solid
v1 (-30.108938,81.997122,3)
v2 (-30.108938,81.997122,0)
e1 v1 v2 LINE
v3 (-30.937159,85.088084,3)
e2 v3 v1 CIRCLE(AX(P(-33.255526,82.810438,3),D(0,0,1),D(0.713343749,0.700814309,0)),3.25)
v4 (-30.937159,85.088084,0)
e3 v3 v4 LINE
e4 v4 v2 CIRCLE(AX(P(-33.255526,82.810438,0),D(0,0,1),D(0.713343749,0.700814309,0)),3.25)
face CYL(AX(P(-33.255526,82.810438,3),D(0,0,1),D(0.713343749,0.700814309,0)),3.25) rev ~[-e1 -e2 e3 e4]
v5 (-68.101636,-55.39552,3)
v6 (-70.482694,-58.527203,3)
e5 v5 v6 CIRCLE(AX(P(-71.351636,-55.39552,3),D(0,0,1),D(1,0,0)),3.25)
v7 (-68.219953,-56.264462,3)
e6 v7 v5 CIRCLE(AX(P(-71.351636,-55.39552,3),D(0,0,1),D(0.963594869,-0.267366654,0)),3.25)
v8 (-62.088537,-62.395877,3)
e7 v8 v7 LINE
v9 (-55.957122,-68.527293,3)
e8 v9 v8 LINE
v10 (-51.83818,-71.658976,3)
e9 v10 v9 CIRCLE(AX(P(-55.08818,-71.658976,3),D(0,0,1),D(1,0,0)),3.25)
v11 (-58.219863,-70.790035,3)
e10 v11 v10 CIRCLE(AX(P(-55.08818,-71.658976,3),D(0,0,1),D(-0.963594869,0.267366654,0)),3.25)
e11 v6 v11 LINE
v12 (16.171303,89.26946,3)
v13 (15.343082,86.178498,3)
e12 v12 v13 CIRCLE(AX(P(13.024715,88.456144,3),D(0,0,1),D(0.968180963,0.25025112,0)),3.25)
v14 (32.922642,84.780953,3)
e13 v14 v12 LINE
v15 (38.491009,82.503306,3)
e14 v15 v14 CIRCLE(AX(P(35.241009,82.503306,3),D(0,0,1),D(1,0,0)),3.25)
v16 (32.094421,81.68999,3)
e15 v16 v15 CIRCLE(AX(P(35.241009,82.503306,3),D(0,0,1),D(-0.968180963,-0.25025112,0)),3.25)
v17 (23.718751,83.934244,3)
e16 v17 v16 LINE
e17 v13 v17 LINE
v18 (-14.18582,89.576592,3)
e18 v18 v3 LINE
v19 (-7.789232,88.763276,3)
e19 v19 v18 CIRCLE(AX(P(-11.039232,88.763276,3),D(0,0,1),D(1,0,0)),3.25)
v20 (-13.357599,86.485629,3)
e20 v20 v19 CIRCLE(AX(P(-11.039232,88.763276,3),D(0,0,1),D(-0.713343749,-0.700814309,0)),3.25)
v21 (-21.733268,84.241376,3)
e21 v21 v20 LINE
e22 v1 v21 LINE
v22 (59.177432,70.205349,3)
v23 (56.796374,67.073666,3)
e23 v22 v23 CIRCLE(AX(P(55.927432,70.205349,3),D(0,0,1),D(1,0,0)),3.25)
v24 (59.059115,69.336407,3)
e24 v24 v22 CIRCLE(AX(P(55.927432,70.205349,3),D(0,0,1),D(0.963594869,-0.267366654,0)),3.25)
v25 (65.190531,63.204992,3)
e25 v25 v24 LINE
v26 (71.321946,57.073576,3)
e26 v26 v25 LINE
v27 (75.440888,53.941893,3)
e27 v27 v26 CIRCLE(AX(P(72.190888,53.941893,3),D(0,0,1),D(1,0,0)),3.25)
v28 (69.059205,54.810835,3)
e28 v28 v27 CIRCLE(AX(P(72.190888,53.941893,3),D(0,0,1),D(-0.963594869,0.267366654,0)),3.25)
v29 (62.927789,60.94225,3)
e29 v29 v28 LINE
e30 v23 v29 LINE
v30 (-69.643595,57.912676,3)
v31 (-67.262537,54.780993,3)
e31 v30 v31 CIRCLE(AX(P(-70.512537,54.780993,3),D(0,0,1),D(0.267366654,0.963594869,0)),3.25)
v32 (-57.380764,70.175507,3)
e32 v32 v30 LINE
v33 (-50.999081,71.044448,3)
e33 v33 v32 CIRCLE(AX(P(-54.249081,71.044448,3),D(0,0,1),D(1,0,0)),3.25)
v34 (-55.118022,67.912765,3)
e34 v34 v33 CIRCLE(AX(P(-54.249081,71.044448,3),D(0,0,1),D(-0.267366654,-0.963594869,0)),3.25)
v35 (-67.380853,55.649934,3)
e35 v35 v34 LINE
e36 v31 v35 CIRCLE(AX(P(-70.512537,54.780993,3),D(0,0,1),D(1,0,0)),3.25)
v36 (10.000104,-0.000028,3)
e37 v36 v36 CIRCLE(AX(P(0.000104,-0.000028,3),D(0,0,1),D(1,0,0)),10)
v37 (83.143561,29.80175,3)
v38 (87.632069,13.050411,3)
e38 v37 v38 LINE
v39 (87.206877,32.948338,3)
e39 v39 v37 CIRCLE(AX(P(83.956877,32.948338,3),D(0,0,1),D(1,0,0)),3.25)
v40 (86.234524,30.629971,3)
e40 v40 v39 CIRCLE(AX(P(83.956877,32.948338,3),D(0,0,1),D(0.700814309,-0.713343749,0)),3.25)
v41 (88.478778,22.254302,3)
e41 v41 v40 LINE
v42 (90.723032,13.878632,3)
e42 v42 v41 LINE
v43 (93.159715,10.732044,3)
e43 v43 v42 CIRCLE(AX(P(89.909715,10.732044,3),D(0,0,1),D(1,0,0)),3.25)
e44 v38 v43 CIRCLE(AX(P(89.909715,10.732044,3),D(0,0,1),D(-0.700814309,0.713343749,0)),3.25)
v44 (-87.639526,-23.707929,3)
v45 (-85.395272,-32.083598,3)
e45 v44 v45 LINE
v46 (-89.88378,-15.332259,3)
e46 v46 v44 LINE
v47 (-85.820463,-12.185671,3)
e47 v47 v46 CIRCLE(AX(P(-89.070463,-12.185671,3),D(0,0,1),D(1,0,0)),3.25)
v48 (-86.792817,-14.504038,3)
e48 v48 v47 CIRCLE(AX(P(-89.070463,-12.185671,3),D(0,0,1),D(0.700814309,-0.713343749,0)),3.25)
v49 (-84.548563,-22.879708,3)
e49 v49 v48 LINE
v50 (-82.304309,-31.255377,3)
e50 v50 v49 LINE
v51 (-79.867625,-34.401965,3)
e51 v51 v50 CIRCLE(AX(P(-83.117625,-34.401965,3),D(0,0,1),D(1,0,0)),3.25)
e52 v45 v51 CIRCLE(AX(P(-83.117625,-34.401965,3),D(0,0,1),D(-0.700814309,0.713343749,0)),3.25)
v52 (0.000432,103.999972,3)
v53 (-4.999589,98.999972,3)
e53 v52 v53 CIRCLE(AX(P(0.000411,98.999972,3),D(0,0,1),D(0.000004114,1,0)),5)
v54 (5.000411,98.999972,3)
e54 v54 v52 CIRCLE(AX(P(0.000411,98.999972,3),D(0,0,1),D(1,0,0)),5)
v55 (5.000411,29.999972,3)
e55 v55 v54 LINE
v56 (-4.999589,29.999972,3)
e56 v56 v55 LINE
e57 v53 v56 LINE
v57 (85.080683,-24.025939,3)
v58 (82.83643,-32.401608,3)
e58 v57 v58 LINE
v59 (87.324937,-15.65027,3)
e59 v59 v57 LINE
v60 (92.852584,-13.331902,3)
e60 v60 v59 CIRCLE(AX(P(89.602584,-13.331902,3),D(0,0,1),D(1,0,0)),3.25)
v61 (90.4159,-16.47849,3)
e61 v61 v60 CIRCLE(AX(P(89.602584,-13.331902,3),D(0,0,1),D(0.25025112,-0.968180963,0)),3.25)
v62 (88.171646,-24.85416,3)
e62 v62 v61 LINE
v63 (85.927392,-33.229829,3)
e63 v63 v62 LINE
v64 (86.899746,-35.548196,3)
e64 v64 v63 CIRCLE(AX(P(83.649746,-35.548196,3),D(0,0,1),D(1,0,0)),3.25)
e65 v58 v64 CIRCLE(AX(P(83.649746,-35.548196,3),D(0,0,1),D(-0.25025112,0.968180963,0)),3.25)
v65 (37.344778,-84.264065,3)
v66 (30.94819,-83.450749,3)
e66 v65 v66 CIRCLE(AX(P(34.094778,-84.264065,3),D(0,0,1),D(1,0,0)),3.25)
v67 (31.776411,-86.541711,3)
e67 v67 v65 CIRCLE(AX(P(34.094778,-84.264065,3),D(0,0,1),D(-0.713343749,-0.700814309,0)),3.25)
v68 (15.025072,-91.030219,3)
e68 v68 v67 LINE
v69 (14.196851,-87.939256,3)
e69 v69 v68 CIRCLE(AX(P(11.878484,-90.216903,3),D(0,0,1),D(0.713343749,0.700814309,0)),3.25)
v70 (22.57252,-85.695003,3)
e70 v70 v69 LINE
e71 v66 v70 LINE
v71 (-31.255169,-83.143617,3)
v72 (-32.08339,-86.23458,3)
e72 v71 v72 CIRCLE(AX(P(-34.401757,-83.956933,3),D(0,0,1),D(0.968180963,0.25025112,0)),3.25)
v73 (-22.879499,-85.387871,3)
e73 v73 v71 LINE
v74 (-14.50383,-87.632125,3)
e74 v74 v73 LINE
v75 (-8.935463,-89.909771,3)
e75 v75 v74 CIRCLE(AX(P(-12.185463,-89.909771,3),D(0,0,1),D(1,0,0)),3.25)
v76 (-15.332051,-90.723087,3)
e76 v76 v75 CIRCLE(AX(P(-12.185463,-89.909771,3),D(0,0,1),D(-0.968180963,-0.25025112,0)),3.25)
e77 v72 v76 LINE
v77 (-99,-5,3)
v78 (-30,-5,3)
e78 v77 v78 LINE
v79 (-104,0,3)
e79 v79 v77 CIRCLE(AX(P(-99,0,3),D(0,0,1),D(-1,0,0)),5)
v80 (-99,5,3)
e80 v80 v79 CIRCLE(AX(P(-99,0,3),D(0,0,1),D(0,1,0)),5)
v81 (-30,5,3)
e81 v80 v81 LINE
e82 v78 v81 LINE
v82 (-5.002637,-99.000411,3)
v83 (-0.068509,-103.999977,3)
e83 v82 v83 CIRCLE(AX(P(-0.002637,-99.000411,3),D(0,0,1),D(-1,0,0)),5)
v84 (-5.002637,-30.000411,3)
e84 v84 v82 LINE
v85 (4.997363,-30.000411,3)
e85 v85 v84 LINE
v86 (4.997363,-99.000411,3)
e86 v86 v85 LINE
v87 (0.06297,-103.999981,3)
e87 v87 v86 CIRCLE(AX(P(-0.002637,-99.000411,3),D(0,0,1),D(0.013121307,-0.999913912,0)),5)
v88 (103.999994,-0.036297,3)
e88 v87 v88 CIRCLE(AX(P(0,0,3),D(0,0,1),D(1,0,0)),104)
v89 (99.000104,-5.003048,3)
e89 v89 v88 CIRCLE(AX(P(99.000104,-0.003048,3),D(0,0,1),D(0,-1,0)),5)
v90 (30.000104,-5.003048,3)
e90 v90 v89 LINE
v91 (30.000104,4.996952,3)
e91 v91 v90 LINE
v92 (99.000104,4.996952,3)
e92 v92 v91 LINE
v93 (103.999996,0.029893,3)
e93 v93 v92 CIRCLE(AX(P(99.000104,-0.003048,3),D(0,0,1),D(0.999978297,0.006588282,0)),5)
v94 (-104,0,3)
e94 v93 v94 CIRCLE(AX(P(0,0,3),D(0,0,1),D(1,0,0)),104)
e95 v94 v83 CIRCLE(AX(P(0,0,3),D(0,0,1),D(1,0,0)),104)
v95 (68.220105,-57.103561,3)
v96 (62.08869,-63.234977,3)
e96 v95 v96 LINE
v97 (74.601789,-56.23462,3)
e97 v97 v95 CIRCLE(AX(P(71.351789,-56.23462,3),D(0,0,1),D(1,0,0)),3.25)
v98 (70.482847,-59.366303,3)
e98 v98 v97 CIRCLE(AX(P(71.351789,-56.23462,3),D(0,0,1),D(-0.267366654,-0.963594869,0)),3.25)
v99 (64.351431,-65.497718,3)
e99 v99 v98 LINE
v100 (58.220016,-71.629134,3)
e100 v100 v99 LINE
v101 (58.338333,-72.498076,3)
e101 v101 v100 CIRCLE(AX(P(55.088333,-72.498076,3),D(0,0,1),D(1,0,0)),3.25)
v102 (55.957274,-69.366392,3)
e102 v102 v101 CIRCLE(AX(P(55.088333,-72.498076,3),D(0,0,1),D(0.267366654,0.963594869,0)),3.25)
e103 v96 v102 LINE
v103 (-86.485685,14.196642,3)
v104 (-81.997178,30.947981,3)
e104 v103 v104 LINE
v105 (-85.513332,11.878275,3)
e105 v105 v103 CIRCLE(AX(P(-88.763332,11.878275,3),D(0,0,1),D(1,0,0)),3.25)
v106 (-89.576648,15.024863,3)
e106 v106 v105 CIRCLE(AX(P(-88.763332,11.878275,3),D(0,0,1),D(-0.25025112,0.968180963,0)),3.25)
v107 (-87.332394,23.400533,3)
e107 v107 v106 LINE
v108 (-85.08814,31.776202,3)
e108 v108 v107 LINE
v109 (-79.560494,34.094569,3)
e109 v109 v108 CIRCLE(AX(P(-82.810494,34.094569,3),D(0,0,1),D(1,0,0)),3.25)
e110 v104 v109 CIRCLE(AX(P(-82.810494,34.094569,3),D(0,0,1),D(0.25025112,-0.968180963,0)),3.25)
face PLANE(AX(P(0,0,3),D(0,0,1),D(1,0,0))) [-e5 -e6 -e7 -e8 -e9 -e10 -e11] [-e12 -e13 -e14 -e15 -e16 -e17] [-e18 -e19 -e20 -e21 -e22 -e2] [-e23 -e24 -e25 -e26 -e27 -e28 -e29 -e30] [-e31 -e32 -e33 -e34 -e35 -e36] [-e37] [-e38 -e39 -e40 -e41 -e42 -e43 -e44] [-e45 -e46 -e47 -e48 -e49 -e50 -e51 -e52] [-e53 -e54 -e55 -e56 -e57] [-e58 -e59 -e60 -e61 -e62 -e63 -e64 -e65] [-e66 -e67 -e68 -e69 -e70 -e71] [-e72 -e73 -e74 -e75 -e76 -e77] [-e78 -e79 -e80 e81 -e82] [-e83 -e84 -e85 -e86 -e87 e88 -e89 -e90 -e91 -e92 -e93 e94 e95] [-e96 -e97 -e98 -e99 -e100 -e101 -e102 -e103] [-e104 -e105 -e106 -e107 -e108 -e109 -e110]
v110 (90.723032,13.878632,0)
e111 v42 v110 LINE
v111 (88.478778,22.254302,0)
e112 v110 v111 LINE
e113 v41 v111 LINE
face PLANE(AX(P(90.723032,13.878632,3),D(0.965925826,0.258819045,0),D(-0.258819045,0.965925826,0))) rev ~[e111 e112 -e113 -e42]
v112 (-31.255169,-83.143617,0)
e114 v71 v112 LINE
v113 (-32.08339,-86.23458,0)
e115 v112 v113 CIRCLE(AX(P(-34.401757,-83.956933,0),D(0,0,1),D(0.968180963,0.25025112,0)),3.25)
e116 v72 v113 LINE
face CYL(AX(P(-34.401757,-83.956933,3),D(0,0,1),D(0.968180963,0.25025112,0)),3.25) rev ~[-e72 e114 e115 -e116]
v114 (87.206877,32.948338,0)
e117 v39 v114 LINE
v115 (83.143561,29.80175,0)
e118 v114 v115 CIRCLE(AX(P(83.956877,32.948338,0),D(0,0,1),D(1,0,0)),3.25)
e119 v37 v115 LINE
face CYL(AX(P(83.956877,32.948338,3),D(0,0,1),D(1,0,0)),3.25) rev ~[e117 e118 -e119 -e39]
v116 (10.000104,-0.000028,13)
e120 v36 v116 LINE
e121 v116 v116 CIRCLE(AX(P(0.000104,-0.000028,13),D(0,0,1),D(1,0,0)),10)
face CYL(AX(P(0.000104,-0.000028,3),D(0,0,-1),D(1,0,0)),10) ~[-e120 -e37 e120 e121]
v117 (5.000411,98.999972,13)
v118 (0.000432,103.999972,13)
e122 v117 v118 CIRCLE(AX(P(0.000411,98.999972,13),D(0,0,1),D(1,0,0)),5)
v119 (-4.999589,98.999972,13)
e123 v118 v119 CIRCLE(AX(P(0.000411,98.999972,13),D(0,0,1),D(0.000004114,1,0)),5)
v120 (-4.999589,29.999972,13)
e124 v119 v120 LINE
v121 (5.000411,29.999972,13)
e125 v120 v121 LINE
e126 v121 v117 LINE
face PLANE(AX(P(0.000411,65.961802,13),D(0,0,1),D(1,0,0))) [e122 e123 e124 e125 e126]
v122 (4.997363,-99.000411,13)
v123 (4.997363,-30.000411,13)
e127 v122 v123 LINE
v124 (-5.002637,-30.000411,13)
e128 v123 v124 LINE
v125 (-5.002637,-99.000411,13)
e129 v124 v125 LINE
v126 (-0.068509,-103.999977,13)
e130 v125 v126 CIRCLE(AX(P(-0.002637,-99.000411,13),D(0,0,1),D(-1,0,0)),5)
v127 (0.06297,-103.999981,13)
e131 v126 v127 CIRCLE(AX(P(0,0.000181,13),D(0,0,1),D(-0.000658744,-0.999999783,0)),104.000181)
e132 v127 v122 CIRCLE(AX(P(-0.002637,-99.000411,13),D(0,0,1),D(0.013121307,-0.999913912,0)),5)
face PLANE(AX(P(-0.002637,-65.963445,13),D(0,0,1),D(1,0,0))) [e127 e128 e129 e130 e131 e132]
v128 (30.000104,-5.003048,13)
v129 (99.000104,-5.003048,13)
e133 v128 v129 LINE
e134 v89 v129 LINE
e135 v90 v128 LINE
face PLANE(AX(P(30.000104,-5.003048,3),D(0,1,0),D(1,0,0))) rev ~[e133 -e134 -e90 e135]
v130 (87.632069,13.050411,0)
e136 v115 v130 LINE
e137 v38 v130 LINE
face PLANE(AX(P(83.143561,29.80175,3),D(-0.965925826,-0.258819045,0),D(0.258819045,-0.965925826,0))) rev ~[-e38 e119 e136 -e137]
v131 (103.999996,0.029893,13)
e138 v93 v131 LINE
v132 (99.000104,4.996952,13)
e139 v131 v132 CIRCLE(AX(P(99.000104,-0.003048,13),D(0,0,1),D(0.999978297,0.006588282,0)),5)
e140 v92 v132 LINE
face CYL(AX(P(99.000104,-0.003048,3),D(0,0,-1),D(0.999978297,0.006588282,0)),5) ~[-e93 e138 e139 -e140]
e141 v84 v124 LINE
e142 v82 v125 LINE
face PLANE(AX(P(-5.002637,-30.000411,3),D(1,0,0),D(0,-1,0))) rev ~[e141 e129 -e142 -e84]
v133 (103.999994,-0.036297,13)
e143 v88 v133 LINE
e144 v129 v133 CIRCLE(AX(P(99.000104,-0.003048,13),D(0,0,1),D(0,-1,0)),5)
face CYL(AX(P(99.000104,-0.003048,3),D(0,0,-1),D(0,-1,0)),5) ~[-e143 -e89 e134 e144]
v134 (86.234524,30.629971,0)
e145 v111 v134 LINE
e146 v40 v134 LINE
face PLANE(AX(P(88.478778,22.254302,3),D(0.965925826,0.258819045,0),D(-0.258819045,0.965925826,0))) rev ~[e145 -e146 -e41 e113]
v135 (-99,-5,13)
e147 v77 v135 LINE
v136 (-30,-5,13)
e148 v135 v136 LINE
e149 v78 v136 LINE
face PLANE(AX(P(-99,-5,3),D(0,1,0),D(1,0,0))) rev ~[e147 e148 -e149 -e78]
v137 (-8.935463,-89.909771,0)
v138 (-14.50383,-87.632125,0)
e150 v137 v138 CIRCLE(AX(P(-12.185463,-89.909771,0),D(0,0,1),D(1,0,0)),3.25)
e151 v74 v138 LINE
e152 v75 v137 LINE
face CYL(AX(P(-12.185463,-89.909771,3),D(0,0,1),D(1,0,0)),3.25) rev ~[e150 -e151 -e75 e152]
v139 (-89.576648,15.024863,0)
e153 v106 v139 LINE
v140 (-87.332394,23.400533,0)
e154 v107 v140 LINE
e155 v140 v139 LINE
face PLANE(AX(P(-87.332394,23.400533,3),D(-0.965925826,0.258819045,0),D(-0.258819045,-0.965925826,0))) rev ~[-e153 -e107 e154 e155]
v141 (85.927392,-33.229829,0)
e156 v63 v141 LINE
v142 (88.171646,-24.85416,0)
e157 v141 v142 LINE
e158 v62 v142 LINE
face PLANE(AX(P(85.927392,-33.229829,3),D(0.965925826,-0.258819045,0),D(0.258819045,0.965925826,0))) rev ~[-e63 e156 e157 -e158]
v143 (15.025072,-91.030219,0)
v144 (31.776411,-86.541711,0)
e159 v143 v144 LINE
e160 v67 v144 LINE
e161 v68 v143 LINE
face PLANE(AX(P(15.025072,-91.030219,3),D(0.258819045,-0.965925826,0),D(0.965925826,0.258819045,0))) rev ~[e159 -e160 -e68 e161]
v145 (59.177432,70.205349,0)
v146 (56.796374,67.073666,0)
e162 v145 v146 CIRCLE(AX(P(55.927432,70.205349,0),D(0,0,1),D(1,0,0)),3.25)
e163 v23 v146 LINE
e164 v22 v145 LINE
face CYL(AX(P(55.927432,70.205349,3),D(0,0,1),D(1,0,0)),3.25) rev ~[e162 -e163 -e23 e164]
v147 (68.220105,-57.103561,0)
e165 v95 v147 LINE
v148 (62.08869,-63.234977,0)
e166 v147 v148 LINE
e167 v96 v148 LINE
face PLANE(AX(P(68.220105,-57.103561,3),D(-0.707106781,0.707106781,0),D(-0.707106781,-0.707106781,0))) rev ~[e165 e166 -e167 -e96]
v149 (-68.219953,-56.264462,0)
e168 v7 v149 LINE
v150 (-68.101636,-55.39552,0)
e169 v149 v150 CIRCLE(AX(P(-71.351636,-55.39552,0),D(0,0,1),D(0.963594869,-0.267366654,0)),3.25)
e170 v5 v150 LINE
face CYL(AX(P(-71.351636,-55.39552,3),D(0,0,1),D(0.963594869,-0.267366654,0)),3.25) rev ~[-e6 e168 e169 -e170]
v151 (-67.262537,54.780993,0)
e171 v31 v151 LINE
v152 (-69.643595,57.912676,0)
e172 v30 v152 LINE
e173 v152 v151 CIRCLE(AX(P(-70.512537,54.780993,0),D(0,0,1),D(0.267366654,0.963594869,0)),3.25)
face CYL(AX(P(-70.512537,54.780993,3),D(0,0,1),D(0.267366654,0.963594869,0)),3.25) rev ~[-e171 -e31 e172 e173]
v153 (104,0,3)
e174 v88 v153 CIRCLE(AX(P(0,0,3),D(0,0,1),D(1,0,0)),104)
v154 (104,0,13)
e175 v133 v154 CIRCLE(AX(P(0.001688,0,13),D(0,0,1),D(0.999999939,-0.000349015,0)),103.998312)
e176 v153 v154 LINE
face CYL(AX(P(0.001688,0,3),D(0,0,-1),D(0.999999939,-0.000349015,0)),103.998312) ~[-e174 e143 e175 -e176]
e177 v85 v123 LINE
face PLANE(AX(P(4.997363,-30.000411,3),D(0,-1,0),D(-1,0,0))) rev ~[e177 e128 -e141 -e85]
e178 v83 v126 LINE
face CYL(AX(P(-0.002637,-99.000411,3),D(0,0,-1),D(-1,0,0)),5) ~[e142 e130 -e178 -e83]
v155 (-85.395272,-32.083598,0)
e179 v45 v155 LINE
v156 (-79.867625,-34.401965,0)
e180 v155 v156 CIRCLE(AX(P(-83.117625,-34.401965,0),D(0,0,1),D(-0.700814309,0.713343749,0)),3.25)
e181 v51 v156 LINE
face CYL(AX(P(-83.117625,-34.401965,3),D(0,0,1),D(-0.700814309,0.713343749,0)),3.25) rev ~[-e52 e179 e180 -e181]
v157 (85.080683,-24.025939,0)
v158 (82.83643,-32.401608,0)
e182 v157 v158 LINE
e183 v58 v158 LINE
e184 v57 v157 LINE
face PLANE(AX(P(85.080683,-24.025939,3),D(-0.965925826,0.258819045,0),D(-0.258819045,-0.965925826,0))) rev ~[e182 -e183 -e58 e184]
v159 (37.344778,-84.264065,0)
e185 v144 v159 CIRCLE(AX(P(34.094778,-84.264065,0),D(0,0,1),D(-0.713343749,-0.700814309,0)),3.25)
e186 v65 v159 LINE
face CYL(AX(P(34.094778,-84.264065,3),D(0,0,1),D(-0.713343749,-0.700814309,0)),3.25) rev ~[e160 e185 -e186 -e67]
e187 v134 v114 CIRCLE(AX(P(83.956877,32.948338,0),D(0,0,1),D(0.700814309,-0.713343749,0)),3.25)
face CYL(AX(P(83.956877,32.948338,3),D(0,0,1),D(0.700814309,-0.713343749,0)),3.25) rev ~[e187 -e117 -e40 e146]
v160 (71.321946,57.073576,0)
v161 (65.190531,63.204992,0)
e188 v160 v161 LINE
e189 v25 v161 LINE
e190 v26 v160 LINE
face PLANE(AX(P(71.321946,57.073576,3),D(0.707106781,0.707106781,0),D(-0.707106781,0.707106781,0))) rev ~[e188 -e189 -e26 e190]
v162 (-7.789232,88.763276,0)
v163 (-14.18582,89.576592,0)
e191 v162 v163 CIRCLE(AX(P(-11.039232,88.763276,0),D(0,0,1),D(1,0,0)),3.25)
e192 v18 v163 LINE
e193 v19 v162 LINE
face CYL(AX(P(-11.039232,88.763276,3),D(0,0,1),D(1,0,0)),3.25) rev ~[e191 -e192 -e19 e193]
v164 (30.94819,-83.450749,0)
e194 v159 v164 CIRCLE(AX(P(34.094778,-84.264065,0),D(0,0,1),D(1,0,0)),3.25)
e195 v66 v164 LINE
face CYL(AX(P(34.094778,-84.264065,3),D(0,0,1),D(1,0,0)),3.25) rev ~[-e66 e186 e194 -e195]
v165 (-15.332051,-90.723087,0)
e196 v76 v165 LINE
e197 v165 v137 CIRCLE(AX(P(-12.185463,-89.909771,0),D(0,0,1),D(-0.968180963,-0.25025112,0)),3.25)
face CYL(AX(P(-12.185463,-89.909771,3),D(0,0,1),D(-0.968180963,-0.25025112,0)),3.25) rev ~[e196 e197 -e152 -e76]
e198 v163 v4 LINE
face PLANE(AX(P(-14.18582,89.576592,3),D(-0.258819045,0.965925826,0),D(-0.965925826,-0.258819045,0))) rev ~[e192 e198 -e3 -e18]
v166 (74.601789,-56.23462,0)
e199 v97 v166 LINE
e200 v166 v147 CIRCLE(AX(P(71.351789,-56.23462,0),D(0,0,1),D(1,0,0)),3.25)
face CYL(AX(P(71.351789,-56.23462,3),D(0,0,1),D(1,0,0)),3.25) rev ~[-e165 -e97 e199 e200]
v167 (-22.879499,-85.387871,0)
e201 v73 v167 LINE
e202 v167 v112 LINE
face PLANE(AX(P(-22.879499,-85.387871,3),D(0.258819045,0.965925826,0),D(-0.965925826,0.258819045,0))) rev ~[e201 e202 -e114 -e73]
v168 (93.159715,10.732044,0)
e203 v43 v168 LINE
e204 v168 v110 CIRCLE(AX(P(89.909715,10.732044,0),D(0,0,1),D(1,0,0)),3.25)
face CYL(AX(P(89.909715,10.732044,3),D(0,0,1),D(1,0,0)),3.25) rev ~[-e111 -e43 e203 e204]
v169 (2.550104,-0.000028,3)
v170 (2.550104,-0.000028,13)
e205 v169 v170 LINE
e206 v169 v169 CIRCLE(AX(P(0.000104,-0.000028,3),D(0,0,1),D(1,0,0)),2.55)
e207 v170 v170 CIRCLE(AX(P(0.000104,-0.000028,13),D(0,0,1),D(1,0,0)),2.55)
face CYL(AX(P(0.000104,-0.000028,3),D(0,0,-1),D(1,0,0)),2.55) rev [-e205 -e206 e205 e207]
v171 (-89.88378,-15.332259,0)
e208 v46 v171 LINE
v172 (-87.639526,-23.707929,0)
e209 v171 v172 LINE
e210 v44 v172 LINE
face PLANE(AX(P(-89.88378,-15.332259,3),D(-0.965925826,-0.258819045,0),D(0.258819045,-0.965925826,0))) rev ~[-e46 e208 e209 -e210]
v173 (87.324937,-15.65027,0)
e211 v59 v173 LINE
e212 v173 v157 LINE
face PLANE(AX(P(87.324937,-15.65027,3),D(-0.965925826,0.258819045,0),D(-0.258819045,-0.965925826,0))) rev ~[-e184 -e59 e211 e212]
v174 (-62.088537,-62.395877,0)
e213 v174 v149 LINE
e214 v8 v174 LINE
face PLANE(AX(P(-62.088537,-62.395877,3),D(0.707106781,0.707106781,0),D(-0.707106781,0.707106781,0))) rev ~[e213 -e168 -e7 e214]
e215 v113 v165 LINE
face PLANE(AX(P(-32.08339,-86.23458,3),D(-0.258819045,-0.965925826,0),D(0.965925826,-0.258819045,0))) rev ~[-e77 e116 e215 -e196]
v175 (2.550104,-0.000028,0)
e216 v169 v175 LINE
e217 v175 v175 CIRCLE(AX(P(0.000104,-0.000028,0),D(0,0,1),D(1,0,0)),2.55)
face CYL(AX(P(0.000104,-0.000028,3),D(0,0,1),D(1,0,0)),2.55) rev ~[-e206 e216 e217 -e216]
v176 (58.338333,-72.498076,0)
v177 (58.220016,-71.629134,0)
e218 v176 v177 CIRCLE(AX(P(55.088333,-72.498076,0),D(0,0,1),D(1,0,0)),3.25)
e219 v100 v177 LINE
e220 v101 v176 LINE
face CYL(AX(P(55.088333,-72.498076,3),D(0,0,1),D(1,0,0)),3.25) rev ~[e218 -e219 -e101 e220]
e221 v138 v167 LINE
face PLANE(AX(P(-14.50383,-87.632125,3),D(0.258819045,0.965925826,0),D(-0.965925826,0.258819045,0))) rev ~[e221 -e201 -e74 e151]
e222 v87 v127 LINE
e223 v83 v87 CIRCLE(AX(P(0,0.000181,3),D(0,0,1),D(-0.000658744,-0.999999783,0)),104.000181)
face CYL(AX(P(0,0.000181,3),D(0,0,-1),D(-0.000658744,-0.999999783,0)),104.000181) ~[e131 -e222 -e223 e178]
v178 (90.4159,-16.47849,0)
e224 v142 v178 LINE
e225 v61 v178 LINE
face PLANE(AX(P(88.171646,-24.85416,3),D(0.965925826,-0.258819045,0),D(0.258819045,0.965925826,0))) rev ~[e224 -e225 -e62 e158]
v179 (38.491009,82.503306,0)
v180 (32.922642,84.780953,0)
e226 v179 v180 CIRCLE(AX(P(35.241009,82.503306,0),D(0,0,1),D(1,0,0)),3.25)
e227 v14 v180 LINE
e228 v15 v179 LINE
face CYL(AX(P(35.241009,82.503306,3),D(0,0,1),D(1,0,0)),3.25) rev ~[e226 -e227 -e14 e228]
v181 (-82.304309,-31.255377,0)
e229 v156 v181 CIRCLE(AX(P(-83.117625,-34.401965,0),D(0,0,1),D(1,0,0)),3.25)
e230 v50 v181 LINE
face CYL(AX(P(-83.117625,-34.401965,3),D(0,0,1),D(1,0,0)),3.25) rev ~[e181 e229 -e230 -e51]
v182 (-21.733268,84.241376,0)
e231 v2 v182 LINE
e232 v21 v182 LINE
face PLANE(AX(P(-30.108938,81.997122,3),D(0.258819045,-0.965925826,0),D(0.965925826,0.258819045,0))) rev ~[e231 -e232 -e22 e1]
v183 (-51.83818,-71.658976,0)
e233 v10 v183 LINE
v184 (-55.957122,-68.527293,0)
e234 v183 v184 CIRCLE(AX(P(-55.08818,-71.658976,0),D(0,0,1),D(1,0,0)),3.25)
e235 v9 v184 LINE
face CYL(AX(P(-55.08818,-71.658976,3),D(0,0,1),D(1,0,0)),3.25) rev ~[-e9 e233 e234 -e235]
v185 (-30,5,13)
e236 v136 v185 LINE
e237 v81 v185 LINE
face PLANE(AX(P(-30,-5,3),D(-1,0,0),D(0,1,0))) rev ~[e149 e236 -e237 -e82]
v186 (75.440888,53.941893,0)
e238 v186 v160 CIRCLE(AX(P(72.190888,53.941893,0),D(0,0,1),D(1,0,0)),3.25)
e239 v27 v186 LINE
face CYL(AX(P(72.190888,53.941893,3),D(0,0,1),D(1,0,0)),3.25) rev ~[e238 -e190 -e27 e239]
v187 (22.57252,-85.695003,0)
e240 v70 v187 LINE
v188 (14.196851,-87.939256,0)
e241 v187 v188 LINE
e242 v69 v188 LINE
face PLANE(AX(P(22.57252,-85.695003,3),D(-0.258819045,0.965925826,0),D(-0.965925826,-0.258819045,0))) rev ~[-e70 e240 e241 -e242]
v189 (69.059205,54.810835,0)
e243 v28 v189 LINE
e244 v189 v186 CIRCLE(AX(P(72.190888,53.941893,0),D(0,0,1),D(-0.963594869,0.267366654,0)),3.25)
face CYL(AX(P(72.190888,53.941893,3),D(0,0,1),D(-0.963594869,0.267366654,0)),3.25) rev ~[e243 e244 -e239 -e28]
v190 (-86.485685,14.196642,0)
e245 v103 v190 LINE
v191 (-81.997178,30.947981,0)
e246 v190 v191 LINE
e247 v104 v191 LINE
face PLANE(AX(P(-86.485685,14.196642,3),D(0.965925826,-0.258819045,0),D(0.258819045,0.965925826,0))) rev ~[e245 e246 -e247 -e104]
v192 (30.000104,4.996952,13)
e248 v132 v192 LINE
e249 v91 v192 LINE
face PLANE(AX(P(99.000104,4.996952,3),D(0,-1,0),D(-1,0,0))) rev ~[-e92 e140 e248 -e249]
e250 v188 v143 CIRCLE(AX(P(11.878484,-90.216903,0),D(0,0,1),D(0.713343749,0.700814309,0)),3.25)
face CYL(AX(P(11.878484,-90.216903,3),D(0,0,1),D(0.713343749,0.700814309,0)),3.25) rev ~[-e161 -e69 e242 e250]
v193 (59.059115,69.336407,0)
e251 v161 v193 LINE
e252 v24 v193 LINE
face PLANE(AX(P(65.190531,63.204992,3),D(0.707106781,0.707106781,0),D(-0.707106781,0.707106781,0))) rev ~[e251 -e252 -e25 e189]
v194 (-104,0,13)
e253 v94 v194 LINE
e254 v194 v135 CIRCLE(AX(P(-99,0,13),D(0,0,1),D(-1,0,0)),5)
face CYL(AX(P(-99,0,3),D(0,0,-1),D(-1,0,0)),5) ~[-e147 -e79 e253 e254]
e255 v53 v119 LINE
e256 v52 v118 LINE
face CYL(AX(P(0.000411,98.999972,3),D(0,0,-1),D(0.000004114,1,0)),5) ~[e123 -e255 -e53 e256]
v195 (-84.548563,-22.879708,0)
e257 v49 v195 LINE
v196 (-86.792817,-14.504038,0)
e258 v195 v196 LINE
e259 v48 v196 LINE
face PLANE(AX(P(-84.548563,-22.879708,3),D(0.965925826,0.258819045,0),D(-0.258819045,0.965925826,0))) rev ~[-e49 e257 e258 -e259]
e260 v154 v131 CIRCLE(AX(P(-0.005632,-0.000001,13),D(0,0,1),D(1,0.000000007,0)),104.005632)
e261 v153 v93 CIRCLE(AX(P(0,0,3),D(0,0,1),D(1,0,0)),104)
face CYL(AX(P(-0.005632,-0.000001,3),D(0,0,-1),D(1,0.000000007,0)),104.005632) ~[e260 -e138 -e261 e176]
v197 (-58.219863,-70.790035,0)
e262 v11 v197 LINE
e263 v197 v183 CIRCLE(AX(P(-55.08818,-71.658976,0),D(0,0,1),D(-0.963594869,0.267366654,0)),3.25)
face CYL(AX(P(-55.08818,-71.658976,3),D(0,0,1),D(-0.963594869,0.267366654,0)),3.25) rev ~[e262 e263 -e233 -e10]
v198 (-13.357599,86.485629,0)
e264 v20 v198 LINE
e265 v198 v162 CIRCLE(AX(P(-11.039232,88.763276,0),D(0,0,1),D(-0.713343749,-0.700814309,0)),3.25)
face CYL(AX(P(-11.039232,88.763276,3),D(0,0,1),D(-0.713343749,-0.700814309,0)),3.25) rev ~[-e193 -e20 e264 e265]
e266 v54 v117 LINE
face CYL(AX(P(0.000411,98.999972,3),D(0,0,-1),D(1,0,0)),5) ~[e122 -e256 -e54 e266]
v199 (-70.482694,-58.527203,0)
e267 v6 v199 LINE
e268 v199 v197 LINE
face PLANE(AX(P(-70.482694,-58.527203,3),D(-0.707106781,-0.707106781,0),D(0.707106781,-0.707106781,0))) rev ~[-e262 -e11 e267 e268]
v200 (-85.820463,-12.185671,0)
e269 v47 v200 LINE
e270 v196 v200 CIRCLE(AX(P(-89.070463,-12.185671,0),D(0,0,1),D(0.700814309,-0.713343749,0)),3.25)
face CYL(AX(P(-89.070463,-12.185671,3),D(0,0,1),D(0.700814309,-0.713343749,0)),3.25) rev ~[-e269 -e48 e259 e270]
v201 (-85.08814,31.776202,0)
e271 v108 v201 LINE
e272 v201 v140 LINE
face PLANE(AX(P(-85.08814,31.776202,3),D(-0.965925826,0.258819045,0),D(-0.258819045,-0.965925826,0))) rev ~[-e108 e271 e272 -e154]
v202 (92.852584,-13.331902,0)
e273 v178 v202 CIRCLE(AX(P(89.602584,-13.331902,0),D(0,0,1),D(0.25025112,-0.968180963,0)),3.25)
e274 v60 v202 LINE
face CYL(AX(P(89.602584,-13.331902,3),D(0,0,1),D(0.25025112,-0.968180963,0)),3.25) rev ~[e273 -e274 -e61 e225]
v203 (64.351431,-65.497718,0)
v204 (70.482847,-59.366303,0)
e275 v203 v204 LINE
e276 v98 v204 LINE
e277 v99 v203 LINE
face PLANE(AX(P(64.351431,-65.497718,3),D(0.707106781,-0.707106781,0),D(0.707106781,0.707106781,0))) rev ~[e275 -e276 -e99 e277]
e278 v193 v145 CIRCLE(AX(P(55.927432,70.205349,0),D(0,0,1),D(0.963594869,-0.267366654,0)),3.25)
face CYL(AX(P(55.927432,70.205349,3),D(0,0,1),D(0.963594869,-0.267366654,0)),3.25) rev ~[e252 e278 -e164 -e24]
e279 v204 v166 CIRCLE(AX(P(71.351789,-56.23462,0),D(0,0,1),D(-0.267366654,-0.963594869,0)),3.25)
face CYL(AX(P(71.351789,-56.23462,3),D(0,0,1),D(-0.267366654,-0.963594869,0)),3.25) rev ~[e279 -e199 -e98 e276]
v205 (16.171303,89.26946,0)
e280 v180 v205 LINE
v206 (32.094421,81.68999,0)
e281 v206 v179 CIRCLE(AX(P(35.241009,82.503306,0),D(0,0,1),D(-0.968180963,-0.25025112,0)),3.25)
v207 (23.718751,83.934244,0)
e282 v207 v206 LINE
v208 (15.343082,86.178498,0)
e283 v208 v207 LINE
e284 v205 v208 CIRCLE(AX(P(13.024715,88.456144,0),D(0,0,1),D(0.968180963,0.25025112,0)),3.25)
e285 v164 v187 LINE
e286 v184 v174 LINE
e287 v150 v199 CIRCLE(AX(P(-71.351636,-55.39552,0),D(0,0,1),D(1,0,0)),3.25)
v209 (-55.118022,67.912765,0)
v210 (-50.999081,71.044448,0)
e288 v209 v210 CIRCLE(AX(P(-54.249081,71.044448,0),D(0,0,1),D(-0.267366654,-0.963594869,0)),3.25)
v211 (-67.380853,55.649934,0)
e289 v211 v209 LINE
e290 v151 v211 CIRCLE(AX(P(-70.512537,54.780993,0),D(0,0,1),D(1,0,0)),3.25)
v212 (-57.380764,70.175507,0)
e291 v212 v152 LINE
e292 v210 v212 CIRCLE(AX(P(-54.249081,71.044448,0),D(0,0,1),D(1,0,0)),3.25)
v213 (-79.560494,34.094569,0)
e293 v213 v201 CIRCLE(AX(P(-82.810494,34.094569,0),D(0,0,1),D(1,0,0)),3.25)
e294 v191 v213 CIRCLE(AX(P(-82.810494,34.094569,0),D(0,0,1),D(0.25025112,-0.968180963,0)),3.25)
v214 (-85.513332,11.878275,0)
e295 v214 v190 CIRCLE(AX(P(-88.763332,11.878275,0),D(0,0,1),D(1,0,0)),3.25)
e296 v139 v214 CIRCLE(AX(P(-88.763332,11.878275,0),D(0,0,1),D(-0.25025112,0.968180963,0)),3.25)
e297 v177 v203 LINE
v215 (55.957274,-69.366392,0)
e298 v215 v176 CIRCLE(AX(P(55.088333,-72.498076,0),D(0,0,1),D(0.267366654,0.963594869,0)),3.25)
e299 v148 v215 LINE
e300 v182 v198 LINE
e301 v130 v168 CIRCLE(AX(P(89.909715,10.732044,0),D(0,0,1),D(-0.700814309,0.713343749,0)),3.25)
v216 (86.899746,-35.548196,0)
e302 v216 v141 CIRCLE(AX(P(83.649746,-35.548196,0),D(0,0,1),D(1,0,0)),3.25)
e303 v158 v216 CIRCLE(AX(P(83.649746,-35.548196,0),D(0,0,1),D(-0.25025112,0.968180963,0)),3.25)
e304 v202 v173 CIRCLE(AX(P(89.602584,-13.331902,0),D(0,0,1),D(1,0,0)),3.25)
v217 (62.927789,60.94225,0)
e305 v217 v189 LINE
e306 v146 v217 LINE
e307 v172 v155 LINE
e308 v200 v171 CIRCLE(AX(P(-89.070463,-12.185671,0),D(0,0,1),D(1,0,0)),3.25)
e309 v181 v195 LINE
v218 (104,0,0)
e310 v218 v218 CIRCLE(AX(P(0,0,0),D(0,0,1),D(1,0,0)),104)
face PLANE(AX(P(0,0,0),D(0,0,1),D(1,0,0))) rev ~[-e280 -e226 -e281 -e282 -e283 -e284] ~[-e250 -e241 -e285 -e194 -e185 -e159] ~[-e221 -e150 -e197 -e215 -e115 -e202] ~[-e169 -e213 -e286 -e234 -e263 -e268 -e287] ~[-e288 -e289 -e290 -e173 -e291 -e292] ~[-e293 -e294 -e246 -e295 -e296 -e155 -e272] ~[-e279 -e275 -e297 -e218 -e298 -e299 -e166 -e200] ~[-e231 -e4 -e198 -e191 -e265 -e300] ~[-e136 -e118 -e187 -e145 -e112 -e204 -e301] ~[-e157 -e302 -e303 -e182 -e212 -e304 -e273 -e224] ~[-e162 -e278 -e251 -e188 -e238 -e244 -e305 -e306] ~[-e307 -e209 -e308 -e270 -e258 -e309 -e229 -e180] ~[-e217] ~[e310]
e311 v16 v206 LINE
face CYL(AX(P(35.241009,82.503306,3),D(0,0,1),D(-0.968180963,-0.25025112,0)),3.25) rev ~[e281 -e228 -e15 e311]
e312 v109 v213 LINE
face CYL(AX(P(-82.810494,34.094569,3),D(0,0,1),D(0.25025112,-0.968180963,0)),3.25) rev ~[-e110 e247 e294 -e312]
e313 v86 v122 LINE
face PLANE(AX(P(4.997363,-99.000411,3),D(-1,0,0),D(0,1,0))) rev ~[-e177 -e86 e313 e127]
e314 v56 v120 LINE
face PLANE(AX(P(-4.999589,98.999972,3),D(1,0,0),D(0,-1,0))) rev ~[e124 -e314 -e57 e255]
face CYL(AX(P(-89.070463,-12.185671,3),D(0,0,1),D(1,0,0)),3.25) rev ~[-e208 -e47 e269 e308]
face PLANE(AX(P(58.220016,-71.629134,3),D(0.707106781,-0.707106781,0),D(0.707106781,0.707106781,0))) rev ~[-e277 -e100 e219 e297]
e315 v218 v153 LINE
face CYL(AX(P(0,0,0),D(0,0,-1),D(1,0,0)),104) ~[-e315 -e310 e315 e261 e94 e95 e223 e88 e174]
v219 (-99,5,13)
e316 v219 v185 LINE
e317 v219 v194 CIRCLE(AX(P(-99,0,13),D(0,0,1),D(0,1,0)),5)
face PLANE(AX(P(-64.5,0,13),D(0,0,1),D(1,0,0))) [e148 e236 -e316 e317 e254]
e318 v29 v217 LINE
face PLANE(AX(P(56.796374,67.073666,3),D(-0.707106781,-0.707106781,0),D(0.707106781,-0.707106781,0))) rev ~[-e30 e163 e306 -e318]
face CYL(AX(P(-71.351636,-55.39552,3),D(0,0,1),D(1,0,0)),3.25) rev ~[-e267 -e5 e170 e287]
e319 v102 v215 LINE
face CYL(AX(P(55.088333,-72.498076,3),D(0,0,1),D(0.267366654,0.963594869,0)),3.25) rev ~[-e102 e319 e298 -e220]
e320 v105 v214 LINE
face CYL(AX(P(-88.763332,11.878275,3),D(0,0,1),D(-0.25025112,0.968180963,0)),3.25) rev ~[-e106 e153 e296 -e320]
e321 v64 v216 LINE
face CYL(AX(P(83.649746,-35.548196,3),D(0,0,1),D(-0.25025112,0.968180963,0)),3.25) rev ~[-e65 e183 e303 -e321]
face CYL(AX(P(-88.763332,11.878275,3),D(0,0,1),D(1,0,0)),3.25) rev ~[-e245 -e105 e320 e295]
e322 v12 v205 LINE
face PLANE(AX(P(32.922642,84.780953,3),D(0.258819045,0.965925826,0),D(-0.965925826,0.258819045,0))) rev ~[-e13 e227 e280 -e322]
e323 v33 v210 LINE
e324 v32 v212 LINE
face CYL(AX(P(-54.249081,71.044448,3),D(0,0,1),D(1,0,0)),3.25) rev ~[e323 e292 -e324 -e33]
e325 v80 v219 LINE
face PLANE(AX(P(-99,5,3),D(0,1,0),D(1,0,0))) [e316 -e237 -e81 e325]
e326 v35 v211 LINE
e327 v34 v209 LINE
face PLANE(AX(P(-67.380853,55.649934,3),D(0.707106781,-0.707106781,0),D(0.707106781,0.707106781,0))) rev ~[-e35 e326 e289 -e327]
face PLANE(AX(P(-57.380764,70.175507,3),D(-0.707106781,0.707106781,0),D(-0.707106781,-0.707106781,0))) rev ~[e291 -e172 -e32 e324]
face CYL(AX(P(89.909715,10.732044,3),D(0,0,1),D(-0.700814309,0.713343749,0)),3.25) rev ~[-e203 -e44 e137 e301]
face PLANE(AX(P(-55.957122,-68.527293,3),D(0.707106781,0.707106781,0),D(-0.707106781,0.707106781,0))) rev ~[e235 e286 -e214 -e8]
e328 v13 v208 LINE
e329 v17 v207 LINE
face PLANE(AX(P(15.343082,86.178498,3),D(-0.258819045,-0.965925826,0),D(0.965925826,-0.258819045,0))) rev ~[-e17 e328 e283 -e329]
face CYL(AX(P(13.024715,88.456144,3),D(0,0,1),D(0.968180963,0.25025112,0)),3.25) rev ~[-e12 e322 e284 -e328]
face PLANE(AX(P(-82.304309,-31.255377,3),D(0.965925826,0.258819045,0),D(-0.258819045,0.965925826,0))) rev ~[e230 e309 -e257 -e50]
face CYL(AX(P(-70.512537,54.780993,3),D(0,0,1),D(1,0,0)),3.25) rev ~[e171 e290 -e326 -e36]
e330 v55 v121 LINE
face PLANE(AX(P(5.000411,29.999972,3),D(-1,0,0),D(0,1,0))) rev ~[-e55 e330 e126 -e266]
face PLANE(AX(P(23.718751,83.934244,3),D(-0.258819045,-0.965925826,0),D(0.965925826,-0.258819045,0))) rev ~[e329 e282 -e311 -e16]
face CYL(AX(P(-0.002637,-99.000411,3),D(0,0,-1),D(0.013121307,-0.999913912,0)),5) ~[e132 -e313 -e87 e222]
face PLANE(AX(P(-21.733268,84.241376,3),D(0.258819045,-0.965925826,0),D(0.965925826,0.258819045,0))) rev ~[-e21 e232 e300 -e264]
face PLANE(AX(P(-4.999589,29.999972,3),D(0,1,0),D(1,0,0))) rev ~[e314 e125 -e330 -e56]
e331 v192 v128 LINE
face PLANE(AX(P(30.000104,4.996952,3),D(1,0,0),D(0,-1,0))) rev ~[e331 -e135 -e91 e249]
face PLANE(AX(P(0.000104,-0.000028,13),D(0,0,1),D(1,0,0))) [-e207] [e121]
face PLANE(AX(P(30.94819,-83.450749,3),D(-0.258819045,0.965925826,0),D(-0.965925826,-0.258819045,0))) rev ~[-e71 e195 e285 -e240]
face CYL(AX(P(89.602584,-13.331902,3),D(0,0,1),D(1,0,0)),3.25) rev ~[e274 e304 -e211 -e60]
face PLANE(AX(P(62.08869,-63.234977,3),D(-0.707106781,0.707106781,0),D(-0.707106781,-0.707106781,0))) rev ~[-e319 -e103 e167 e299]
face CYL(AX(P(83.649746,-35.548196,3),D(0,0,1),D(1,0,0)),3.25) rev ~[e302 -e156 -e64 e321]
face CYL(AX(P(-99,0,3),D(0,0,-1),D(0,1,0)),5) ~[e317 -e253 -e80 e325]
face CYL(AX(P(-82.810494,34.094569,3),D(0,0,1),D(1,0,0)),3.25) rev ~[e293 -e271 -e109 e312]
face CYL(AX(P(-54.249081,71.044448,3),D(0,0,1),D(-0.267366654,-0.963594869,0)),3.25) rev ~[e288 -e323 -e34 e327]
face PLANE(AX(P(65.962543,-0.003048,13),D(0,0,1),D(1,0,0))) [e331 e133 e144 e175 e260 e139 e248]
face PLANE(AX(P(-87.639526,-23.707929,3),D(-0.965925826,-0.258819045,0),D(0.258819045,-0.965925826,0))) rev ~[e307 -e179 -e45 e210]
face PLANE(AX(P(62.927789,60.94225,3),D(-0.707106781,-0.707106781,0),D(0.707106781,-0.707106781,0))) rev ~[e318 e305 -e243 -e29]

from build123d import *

# Parameters (mm, degrees)
F0_R     = 104
F1_DEPTH = 3
F2_W     = 69
F2_H     = 10
F2_R     = 10
F2_R_2   = 2.55
F3_DEPTH = 10
F4_DEPTH = 3


# Not quite as in the source:
# - a feature names something its author has since deleted; it is built from what else it names


with BuildPart() as f1:
    # F0 (on Top) → F1 (new body)
    with BuildSketch(Plane.XY):
        Circle(F0_R)
    extrude(amount=F1_DEPTH)

    # F2 (on face) → F3 (join)
    with BuildSketch(Plane.XY.offset(3)):
        with Locations((-64.5, 0)):
            Rectangle(F2_W, F2_H)
        with BuildLine():
            ThreePointArc((-104, 0), (-102.5355339059, -3.5355339059), (-99, -5))
            Line((-99, -5), (-99, 5))
            ThreePointArc((-99, 5), (-102.5355339059, 3.5355339059), (-104, 0))
        make_face()
        with BuildLine():
            ThreePointArc((5.0004113768, 98.9999720748), (3.5359525549, 102.5354987085), (0.0004319457, 103.9999720747))
            ThreePointArc((0.0004319457, 103.9999720747), (-3.535115257, 102.5355132529), (-4.9995886232, 98.9999720748))
            Line((-4.9995886232, 98.9999720748), (-4.9995886232, 29.9999720748))
            Line((-4.9995886232, 29.9999720748), (5.0004113768, 29.9999720748))
            Line((5.0004113768, 29.9999720748), (5.0004113768, 98.9999720748))
        make_face()
        with BuildLine():
            ThreePointArc((-5.0026366169, -99.0004113768), (-3.5613838811, -102.5125785011), (-0.0685094531, -103.9999774349))
            ThreePointArc((-0.0685094531, -103.9999774349), (-0.0027697678, -103.9999999631), (0.0629699186, -103.9999809365))
            ThreePointArc((0.0629699186, -103.9999809365), (3.5560171087, -102.5126732778), (4.9973633831, -99.0004113768))
            Line((4.9973633831, -99.0004113768), (4.9973633831, -30.0004113768))
            Line((4.9973633831, -30.0004113768), (-5.0026366169, -30.0004113768))
            Line((-5.0026366169, -30.0004113768), (-5.0026366169, -99.0004113768))
        make_face()
        with BuildLine():
            ThreePointArc((104, 0), (103.9999989259, 0.0149467086), (103.9999957038, 0.0298934169))
            ThreePointArc((103.9999957038, 0.0298934169), (102.523972331, 3.5441133399), (99.0001042186, 4.9969520064))
            Line((99.0001042186, 4.9969520064), (30.0001042186, 4.9969520064))
            Line((30.0001042186, 4.9969520064), (30.0001042186, -5.0030479936))
            Line((30.0001042186, -5.0030479936), (99.0001042186, -5.0030479936))
            ThreePointArc((99.0001042186, -5.0030479936), (102.5238631201, -3.5503178176), (103.9999936659, -0.0362972752))
            ThreePointArc((103.9999936659, -0.0362972752), (103.9999984165, -0.0181486379), (104, 0))
        make_face()
        with Locations((0.0001042186, -2.79252e-05)):
            Circle(F2_R)
        with Locations((0.0001042186, -2.79252e-05)):
            Circle(F2_R_2, mode=Mode.SUBTRACT)
    extrude(amount=F3_DEPTH)

    # F2 (on face) → F4 (cut, through all)
    with BuildSketch(Plane.XY.offset(3)):
        with BuildLine():
            ThreePointArc((-85.513331806, 11.878275299), (-85.7662623092, 13.135285415), (-86.4856853023, 14.196642484))
            ThreePointArc((-86.4856853023, 14.196642484), (-87.9221699094, 15.0175342345), (-89.5766479464, 15.0248634284))
            ThreePointArc((-89.5766479464, 15.0248634284), (-90.7532090061, 9.3086666268), (-85.513331806, 11.878275299))
        make_face()
        with BuildLine():
            Line((-86.4856853023, 14.196642484), (-84.2414314652, 22.5723118292))
            Line((-84.2414314652, 22.5723118292), (-81.9971776281, 30.9479811744))
            ThreePointArc((-81.9971776281, 30.9479811744), (-83.6516556652, 30.9553103683), (-85.0881402722, 31.7762021187))
            Line((-85.0881402722, 31.7762021187), (-87.3323941093, 23.4005327735))
            Line((-87.3323941093, 23.4005327735), (-89.5766479464, 15.0248634284))
            ThreePointArc((-89.5766479464, 15.0248634284), (-87.9221699094, 15.0175342345), (-86.4856853023, 14.196642484))
        make_face()
        with BuildLine():
            ThreePointArc((-85.0881402722, 31.7762021187), (-83.6516556652, 30.9553103683), (-81.9971776281, 30.9479811744))
            ThreePointArc((-81.9971776281, 30.9479811744), (-80.2408850964, 32.1046921035), (-79.5604937686, 34.0945693037))
            ThreePointArc((-79.5604937686, 34.0945693037), (-84.0675038845, 37.0916388005), (-85.0881402722, 31.7762021187))
        make_face()
        with BuildLine():
            ThreePointArc((-67.2625366366, 54.7809925082), (-67.2922516486, 55.2194723778), (-67.3808533111, 55.6499341339))
            ThreePointArc((-67.3808533111, 55.6499341339), (-68.2144395978, 57.079089547), (-69.6435950109, 57.9126758337))
            ThreePointArc((-69.6435950109, 57.9126758337), (-73.0996740782, 52.8139592451), (-67.2625366366, 54.7809925082))
        make_face()
        with BuildLine():
            Line((-67.3808533111, 55.6499341339), (-61.2494378031, 61.7813496419))
            Line((-61.2494378031, 61.7813496419), (-55.118022295, 67.91276515))
            ThreePointArc((-55.118022295, 67.91276515), (-56.5471777082, 68.7463514366), (-57.3807639948, 70.1755068498))
            Line((-57.3807639948, 70.1755068498), (-63.5121795029, 64.0440913417))
            Line((-63.5121795029, 64.0440913417), (-69.6435950109, 57.9126758337))
            ThreePointArc((-69.6435950109, 57.9126758337), (-68.2144395978, 57.079089547), (-67.3808533111, 55.6499341339))
        make_face()
        with BuildLine():
            ThreePointArc((-57.3807639948, 70.1755068498), (-56.5471777082, 68.7463514366), (-55.118022295, 67.91276515))
            ThreePointArc((-55.118022295, 67.91276515), (-52.2820474062, 68.4573110339), (-50.9990806693, 71.0444484755))
            ThreePointArc((-50.9990806693, 71.0444484755), (-54.687560539, 74.2647334635), (-57.3807639948, 70.1755068498))
        make_face()
        with BuildLine():
            ThreePointArc((-30.9371585912, 85.0880844217), (-36.3947847116, 81.9692760214), (-30.1089376468, 81.9971217775))
            ThreePointArc((-30.1089376468, 81.9971217775), (-30.0314823971, 82.4005058629), (-30.0055257762, 82.810437918))
            ThreePointArc((-30.0055257762, 82.810437918), (-30.2474372343, 84.0408457059), (-30.9371585912, 85.0880844217))
        make_face()
        with BuildLine():
            Line((-30.1089376468, 81.9971217775), (-21.7332683017, 84.2413756146))
            Line((-21.7332683017, 84.2413756146), (-13.3575989565, 86.4856294518))
            ThreePointArc((-13.3575989565, 86.4856294518), (-14.1784907069, 87.9221140588), (-14.1858199008, 89.5765920959))
            Line((-14.1858199008, 89.5765920959), (-22.561489246, 87.3323382588))
            Line((-22.561489246, 87.3323382588), (-30.9371585912, 85.0880844217))
            ThreePointArc((-30.9371585912, 85.0880844217), (-30.2474372343, 84.0408457059), (-30.0055257762, 82.810437918))
            ThreePointArc((-30.0055257762, 82.810437918), (-30.0314823971, 82.4005058629), (-30.1089376468, 81.9971217775))
        make_face()
        with BuildLine():
            ThreePointArc((-14.1858199008, 89.5765920959), (-14.1784907069, 87.9221140588), (-13.3575989565, 86.4856294518))
            ThreePointArc((-13.3575989565, 86.4856294518), (-9.8088239837, 85.7551874135), (-7.7892317715, 88.7632759554))
            ThreePointArc((-7.7892317715, 88.7632759554), (-10.6292997163, 91.9873193345), (-14.1858199008, 89.5765920959))
        make_face()
        with BuildLine():
            ThreePointArc((16.1713029323, 89.2694604072), (9.8854558676, 89.2973061633), (15.343081988, 86.1784977631))
            ThreePointArc((15.343081988, 86.1784977631), (16.0328033449, 87.2257364789), (16.274714803, 88.4561442667))
            ThreePointArc((16.274714803, 88.4561442667), (16.2487581821, 88.8660763219), (16.1713029323, 89.2694604072))
        make_face()
        with BuildLine():
            Line((15.343081988, 86.1784977631), (23.7187513332, 83.934243926))
            Line((23.7187513332, 83.934243926), (32.0944206783, 81.6899900889))
            ThreePointArc((32.0944206783, 81.6899900889), (32.1017498722, 83.3444681259), (32.9226416227, 84.780952733))
            Line((32.9226416227, 84.780952733), (24.5469722775, 87.0252065701))
            Line((24.5469722775, 87.0252065701), (16.1713029323, 89.2694604072))
            ThreePointArc((16.1713029323, 89.2694604072), (16.2487581821, 88.8660763219), (16.274714803, 88.4561442667))
            ThreePointArc((16.274714803, 88.4561442667), (16.0328033449, 87.2257364789), (15.343081988, 86.1784977631))
        make_face()
        with BuildLine():
            ThreePointArc((32.9226416227, 84.780952733), (32.1017498722, 83.3444681259), (32.0944206783, 81.6899900889))
            ThreePointArc((32.0944206783, 81.6899900889), (35.6509408628, 79.2792628503), (38.4910088077, 82.5033062293))
            ThreePointArc((38.4910088077, 82.5033062293), (36.4714165955, 85.5113947712), (32.9226416227, 84.780952733))
        make_face()
        with BuildLine():
            ThreePointArc((59.1774320122, 70.2053490974), (53.3402945706, 72.1723823605), (56.7963736378, 67.0736657719))
            ThreePointArc((56.7963736378, 67.0736657719), (58.225529051, 67.9072520585), (59.0591153376, 69.3364074717))
            ThreePointArc((59.0591153376, 69.3364074717), (59.1477170002, 69.7668692277), (59.1774320122, 70.2053490974))
        make_face()
        with BuildLine():
            Line((56.7963736378, 67.0736657719), (62.9277891459, 60.9422502638))
            Line((62.9277891459, 60.9422502638), (69.059204654, 54.8108347558))
            ThreePointArc((69.059204654, 54.8108347558), (69.8927909406, 56.2399901689), (71.3219463538, 57.0735764556))
            Line((71.3219463538, 57.0735764556), (65.1905308457, 63.2049919636))
            Line((65.1905308457, 63.2049919636), (59.0591153376, 69.3364074717))
            ThreePointArc((59.0591153376, 69.3364074717), (58.225529051, 67.9072520585), (56.7963736378, 67.0736657719))
        make_face()
        with BuildLine():
            ThreePointArc((71.3219463538, 57.0735764556), (69.8927909406, 56.2399901689), (69.059204654, 54.8108347558))
            ThreePointArc((69.059204654, 54.8108347558), (71.7524081098, 50.7216081421), (75.4408879794, 53.9418931301))
            ThreePointArc((75.4408879794, 53.9418931301), (74.1579212426, 56.5290305717), (71.3219463538, 57.0735764556))
        make_face()
        with BuildLine():
            ThreePointArc((87.206877422, 32.9483382369), (81.9670002218, 35.5179469091), (83.1435612815, 29.8017501076))
            ThreePointArc((83.1435612815, 29.8017501076), (84.7980393186, 29.8090793015), (86.2345239256, 30.6299710519))
            ThreePointArc((86.2345239256, 30.6299710519), (86.9539469187, 31.6913281209), (87.206877422, 32.9483382369))
        make_face()
        with BuildLine():
            Line((83.1435612815, 29.8017501076), (85.3878151186, 21.4260807624))
            Line((85.3878151186, 21.4260807624), (87.6320689557, 13.0504114172))
            ThreePointArc((87.6320689557, 13.0504114172), (89.0685535628, 13.8713031677), (90.7230315998, 13.8786323616))
            Line((90.7230315998, 13.8786323616), (88.4787777627, 22.2543017067))
            Line((88.4787777627, 22.2543017067), (86.2345239256, 30.6299710519))
            ThreePointArc((86.2345239256, 30.6299710519), (84.7980393186, 29.8090793015), (83.1435612815, 29.8017501076))
        make_face()
        with BuildLine():
            ThreePointArc((90.7230315998, 13.8786323616), (89.0685535628, 13.8713031677), (87.6320689557, 13.0504114172))
            ThreePointArc((87.6320689557, 13.0504114172), (88.6527053434, 7.7349747355), (93.1597154593, 10.7320442322))
            ThreePointArc((93.1597154593, 10.7320442322), (92.4793241316, 12.7219214324), (90.7230315998, 13.8786323616))
        make_face()
        with BuildLine():
            ThreePointArc((92.8525837707, -13.3319023423), (88.3455736547, -10.3348328455), (87.324937267, -15.6502695273))
            ThreePointArc((87.324937267, -15.6502695273), (88.7614218741, -16.4711612777), (90.4158999111, -16.4784904716))
            ThreePointArc((90.4158999111, -16.4784904716), (92.1721924429, -15.3217795424), (92.8525837707, -13.3319023423))
        make_face()
        with BuildLine():
            Line((87.324937267, -15.6502695273), (85.0806834299, -24.0259388724))
            Line((85.0806834299, -24.0259388724), (82.8364295928, -32.4016082176))
            ThreePointArc((82.8364295928, -32.4016082176), (84.4909076299, -32.4089374115), (85.9273922369, -33.2298291619))
            Line((85.9273922369, -33.2298291619), (88.171646074, -24.8541598168))
            Line((88.171646074, -24.8541598168), (90.4158999111, -16.4784904716))
            ThreePointArc((90.4158999111, -16.4784904716), (88.7614218741, -16.4711612777), (87.324937267, -15.6502695273))
        make_face()
        with BuildLine():
            ThreePointArc((85.9273922369, -33.2298291619), (84.4909076299, -32.4089374115), (82.8364295928, -32.4016082176))
            ThreePointArc((82.8364295928, -32.4016082176), (81.6598685331, -38.1178050191), (86.8997457333, -35.5481963469))
            ThreePointArc((86.8997457333, -35.5481963469), (86.6468152301, -34.291186231), (85.9273922369, -33.2298291619))
        make_face()
        with BuildLine():
            ThreePointArc((74.6017886013, -56.2346195514), (70.9133087317, -53.0143345634), (68.2201052758, -57.1035611771))
            ThreePointArc((68.2201052758, -57.1035611771), (69.0536915625, -58.5327165903), (70.4828469756, -59.3663028769))
            ThreePointArc((70.4828469756, -59.3663028769), (73.3188218645, -58.821756993), (74.6017886013, -56.2346195514))
        make_face()
        with BuildLine():
            Line((68.2201052758, -57.1035611771), (62.0886897678, -63.2349766852))
            Line((62.0886897678, -63.2349766852), (55.9572742597, -69.3663921932))
            ThreePointArc((55.9572742597, -69.3663921932), (57.3864296729, -70.1999784798), (58.2200159595, -71.629133893))
            Line((58.2200159595, -71.629133893), (64.3514314676, -65.497718385))
            Line((64.3514314676, -65.497718385), (70.4828469756, -59.3663028769))
            ThreePointArc((70.4828469756, -59.3663028769), (69.0536915625, -58.5327165903), (68.2201052758, -57.1035611771))
        make_face()
        with BuildLine():
            ThreePointArc((58.2200159595, -71.629133893), (57.3864296729, -70.1999784798), (55.9572742597, -69.3663921932))
            ThreePointArc((55.9572742597, -69.3663921932), (52.5011951924, -74.4651087818), (58.338332634, -72.4980755187))
            ThreePointArc((58.338332634, -72.4980755187), (58.308617622, -72.0595956491), (58.2200159595, -71.629133893))
        make_face()
        with BuildLine():
            ThreePointArc((37.3447777409, -84.2640649612), (34.504709796, -81.0400215822), (30.9481896115, -83.4507488208))
            ThreePointArc((30.9481896115, -83.4507488208), (30.9555188054, -85.1052268578), (31.7764105559, -86.5417114649))
            ThreePointArc((31.7764105559, -86.5417114649), (35.3251855287, -87.2721535031), (37.3447777409, -84.2640649612))
        make_face()
        with BuildLine():
            Line((30.9481896115, -83.4507488208), (22.5725202664, -85.6950026579))
            Line((22.5725202664, -85.6950026579), (14.1968509212, -87.939256495))
            ThreePointArc((14.1968509212, -87.939256495), (14.8865722781, -88.9864952108), (15.1284837362, -90.2169029986))
            ThreePointArc((15.1284837362, -90.2169029986), (15.1025271153, -90.6268350538), (15.0250718655, -91.0302191391))
            Line((15.0250718655, -91.0302191391), (23.4007412107, -88.785965302))
            Line((23.4007412107, -88.785965302), (31.7764105559, -86.5417114649))
            ThreePointArc((31.7764105559, -86.5417114649), (30.9555188054, -85.1052268578), (30.9481896115, -83.4507488208))
        make_face()
        with BuildLine():
            ThreePointArc((15.1284837362, -90.2169029986), (14.8865722781, -88.9864952108), (14.1968509212, -87.939256495))
            ThreePointArc((14.1968509212, -87.939256495), (8.7392248008, -91.0580648952), (15.0250718655, -91.0302191391))
            ThreePointArc((15.0250718655, -91.0302191391), (15.1025271153, -90.6268350538), (15.1284837362, -90.2169029986))
        make_face()
        with BuildLine():
            ThreePointArc((-8.9354628383, -89.9097713099), (-10.9550550505, -86.9016827681), (-14.5038300233, -87.6321248063))
            ThreePointArc((-14.5038300233, -87.6321248063), (-15.3247217737, -89.0686094133), (-15.3320509676, -90.7230874504))
            ThreePointArc((-15.3320509676, -90.7230874504), (-11.7755307831, -93.133814689), (-8.9354628383, -89.9097713099))
        make_face()
        with BuildLine():
            ThreePointArc((-31.2551687136, -83.1436171321), (-31.1777134639, -83.5470012174), (-31.151756843, -83.9569332726))
            ThreePointArc((-31.151756843, -83.9569332726), (-31.3936683011, -85.1873410604), (-32.083389658, -86.2345797762))
            Line((-32.083389658, -86.2345797762), (-23.7077203128, -88.4788336133))
            Line((-23.7077203128, -88.4788336133), (-15.3320509676, -90.7230874504))
            ThreePointArc((-15.3320509676, -90.7230874504), (-15.3247217737, -89.0686094133), (-14.5038300233, -87.6321248063))
            Line((-14.5038300233, -87.6321248063), (-22.8794993685, -85.3878709692))
            Line((-22.8794993685, -85.3878709692), (-31.2551687136, -83.1436171321))
        make_face()
        with BuildLine():
            ThreePointArc((-32.083389658, -86.2345797762), (-31.3936683011, -85.1873410604), (-31.151756843, -83.9569332726))
            ThreePointArc((-31.151756843, -83.9569332726), (-31.1777134639, -83.5470012174), (-31.2551687136, -83.1436171321))
            ThreePointArc((-31.2551687136, -83.1436171321), (-37.5410157784, -83.115771376), (-32.083389658, -86.2345797762))
        make_face()
        with BuildLine():
            ThreePointArc((-51.8381800475, -71.6589761406), (-53.1211467843, -69.071838699), (-55.9571216731, -68.5272928151))
            ThreePointArc((-55.9571216731, -68.5272928151), (-57.3862770863, -69.3608791017), (-58.2198633729, -70.7900345149))
            ThreePointArc((-58.2198633729, -70.7900345149), (-55.5266599171, -74.8792611286), (-51.8381800475, -71.6589761406))
        make_face()
        with BuildLine():
            Line((-55.9571216731, -68.5272928151), (-62.0885371812, -62.395877307))
            Line((-62.0885371812, -62.395877307), (-68.2199526893, -56.264461799))
            ThreePointArc((-68.2199526893, -56.264461799), (-69.0535389759, -57.6936172122), (-70.482694389, -58.5272034988))
            Line((-70.482694389, -58.5272034988), (-64.351278881, -64.6586190068))
            Line((-64.351278881, -64.6586190068), (-58.2198633729, -70.7900345149))
            ThreePointArc((-58.2198633729, -70.7900345149), (-57.3862770863, -69.3608791017), (-55.9571216731, -68.5272928151))
        make_face()
        with BuildLine():
            ThreePointArc((-70.482694389, -58.5272034988), (-69.0535389759, -57.6936172122), (-68.2199526893, -56.264461799))
            ThreePointArc((-68.2199526893, -56.264461799), (-68.1313510267, -55.8340000429), (-68.1016360147, -55.3955201733))
            ThreePointArc((-68.1016360147, -55.3955201733), (-73.9387734563, -53.4284869102), (-70.482694389, -58.5272034988))
        make_face()
        with BuildLine():
            ThreePointArc((-79.8676254573, -34.4019652801), (-80.5480167851, -32.41208808), (-82.3043093168, -31.2553771508))
            ThreePointArc((-82.3043093168, -31.2553771508), (-83.9587873539, -31.2627063447), (-85.3952719609, -32.0835980951))
            ThreePointArc((-85.3952719609, -32.0835980951), (-84.3746355732, -37.3990347769), (-79.8676254573, -34.4019652801))
        make_face()
        with BuildLine():
            Line((-82.3043093168, -31.2553771508), (-84.5485631539, -22.8797078056))
            Line((-84.5485631539, -22.8797078056), (-86.792816991, -14.5040384605))
            ThreePointArc((-86.792816991, -14.5040384605), (-88.2293015981, -15.3249302109), (-89.8837796351, -15.3322594048))
            Line((-89.8837796351, -15.3322594048), (-87.639525798, -23.70792875))
            Line((-87.639525798, -23.70792875), (-85.3952719609, -32.0835980951))
            ThreePointArc((-85.3952719609, -32.0835980951), (-83.9587873539, -31.2627063447), (-82.3043093168, -31.2553771508))
        make_face()
        with BuildLine():
            ThreePointArc((-89.8837796351, -15.3322594048), (-88.2293015981, -15.3249302109), (-86.792816991, -14.5040384605))
            ThreePointArc((-86.792816991, -14.5040384605), (-86.0733939979, -13.4426813914), (-85.8204634946, -12.1856712755))
            ThreePointArc((-85.8204634946, -12.1856712755), (-91.0603406948, -9.6160626033), (-89.8837796351, -15.3322594048))
        make_face()
        with Locations((0.0001042186, -2.79252e-05)):
            Circle(F2_R_2)
    extrude(amount=-F4_DEPTH, mode=Mode.SUBTRACT)


solid = f1.part
